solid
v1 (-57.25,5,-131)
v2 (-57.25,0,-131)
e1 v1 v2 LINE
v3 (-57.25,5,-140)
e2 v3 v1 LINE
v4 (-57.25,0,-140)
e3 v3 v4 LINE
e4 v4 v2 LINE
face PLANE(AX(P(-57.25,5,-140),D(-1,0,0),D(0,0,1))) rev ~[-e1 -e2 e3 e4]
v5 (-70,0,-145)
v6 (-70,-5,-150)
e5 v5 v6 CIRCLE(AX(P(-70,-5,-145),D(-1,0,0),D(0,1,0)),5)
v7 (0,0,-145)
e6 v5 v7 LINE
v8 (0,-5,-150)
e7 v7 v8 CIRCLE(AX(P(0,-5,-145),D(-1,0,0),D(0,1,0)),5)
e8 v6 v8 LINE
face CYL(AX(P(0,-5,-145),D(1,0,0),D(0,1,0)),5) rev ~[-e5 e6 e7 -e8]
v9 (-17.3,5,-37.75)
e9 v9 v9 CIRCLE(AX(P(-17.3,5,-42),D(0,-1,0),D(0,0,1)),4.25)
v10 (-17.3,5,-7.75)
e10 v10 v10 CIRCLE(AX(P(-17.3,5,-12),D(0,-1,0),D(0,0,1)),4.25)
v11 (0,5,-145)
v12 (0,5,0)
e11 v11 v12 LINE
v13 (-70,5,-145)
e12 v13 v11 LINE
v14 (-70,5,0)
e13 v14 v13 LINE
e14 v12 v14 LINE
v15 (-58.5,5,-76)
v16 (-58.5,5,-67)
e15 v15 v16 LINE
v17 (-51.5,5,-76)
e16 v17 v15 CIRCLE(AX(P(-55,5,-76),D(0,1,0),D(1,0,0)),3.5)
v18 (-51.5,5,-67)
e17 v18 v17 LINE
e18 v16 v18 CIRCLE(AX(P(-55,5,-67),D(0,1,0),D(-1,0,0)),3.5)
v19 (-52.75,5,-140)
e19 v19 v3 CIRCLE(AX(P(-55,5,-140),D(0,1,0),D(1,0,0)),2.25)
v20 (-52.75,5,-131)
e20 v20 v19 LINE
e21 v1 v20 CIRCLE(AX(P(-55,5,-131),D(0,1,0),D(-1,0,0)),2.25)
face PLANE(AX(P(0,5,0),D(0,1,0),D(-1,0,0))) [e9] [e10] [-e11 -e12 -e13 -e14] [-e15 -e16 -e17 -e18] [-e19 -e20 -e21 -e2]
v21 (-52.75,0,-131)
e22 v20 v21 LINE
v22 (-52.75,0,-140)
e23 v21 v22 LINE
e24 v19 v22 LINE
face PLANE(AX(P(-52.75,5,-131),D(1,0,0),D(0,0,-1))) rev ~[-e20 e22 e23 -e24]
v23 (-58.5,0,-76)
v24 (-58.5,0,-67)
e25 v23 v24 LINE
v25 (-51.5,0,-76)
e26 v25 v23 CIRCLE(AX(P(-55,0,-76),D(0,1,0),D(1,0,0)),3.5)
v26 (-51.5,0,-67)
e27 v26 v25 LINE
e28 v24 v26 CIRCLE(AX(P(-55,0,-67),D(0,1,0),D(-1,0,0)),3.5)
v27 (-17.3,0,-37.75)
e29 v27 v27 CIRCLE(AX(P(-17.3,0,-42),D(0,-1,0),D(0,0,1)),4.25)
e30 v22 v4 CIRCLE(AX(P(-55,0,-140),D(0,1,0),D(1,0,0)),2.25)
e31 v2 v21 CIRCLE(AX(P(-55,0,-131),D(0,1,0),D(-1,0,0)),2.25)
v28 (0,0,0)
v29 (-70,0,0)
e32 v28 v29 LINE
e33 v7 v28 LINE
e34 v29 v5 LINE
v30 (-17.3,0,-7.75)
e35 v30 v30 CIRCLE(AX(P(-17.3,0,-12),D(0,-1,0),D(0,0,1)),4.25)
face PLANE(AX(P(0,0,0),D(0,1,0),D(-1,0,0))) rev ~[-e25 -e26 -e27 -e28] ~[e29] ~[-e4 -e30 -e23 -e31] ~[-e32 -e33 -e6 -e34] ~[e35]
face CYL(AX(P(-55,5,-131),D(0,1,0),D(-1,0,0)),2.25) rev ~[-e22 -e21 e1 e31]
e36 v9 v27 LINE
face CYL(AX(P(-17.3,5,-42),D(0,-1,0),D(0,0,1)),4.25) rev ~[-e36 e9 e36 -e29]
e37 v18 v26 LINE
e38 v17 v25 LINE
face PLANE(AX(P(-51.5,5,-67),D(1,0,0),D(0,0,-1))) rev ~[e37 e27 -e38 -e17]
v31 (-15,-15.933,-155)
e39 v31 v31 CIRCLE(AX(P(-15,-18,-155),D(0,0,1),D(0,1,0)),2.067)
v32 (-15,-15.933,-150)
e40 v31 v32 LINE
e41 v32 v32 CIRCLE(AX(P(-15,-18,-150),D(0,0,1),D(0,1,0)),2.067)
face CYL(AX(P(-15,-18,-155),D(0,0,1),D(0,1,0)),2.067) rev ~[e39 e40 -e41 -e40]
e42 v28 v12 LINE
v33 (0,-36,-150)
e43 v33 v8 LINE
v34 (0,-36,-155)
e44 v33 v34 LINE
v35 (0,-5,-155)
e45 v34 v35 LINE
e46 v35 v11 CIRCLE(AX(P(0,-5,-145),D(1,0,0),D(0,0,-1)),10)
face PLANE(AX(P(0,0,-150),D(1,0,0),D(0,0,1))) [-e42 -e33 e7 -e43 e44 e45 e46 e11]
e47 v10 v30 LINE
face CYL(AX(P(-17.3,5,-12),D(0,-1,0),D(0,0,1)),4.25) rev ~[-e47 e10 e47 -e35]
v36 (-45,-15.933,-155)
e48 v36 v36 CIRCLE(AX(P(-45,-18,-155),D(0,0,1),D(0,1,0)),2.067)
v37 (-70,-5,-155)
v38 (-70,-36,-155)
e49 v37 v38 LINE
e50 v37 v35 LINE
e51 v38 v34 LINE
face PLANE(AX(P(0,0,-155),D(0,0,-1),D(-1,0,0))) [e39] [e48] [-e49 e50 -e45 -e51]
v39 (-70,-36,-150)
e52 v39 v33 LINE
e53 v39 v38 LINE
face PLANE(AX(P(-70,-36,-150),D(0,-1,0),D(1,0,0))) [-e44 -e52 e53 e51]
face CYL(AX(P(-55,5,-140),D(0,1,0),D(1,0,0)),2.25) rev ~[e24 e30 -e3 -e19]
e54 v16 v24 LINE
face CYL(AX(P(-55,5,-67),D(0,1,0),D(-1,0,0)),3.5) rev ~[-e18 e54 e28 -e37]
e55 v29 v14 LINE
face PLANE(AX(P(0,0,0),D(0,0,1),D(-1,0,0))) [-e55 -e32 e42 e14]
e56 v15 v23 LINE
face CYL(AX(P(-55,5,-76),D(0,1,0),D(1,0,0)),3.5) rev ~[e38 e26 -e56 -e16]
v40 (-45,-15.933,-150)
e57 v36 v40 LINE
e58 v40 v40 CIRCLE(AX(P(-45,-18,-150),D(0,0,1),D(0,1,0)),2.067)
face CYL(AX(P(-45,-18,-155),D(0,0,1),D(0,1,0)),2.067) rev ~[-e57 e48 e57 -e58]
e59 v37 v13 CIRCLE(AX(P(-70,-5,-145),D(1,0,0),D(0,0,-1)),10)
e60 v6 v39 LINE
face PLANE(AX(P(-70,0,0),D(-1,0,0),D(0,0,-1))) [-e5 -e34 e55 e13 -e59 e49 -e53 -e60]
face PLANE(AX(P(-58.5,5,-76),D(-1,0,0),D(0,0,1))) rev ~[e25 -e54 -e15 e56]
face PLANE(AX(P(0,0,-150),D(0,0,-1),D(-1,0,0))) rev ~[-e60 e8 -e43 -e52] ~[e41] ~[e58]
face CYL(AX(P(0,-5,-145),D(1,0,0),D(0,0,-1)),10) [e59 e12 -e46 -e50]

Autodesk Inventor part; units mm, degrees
ref_plane "YZ Plane" through (0, 0, 0) normal (1, 0, 0) x (0, 1, 0)
ref_plane "XZ Plane" through (0, 0, 0) normal (0, 1, 0) x (-1, 0, 0)
ref_plane "XY Plane" through (0, 0, 0) normal (0, 0, 1) x (1, 0, 0)
sketch "Sketch1" plane through (0, 0, 0) normal (0, 1, 0) x (-1, 0, 0)
  line L0 (0, 0) -> (70, 0)
  line L1 (70, 0) -> (70, -150)
  line L2 (70, -150) -> (0, -150)
  line L3 (0, -150) -> (0, 0)
  dimension "d0" = 70
  dimension "d1" = 150
extrude "Plate1" add sketch "Sketch1" along normal blind 5
sketch "Sketch2" plane through (0, 0, -150) normal (0, 0, -1) x (-1, 0, 0)
  line L0 (70, 5) -> (0, 5)
  line L1 (0, 5) -> (70, 5)
  line L2 (70, 5) -> (70, -36)
  line L3 (70, -36) -> (0, -36)
  line L4 (0, -36) -> (0, 5)
  point P0 (0, 0)
  dimension "d3" = 70
  dimension "d4" = 41
sheet face with bend "Face2" sketch "Sketch2" thickness 5 toward (0, 0, -1) bend radius 5
bend "Bend1"
sketch "Sketch3" plane through (0, 0, -155) normal (0, 0, -1) x (-1, 0, 0)
  line L0 (70, -36) -> (0, -36) projected
  line L1 (70, -5) -> (70, -36) projected
  point P0 (0, 0)
  point P1 (45, -18)
  point P2 (15, -18)
  dimension "d10" = 18
  dimension "d11" = 18
  dimension "d19" = 25
  dimension "d20" = 30
hole "Hole1" at (-45, -18, -155) at (-15, -18, -155) direction (0, 0, 1) diameter 4.134 depth 5 thread size "M5x0.8" class "6H" standard "ISO Metric profile"
sketch "Sketch4" plane through (0, 5, 0) normal (0, 1, 0) x (1, 0, 0)
  line L0 (-70, 145) -> (0, 145) projected
  line L1 (-55, 145) -> (-55, 0) construction
  line L2 (-70, 0) -> (0, 0) projected
  line L3 (-70, 0) -> (-70, 145) projected
  line L4 (-57.25, 131) -> (-52.75, 131)
  line L5 (-52.75, 131) -> (-52.75, 140)
  line L6 (-52.75, 140) -> (-57.25, 140)
  line L7 (-57.25, 140) -> (-57.25, 131)
  line L8 (-57.25, 131) -> (-52.75, 140) construction
  line L9 (-52.75, 131) -> (-57.25, 140) construction
  arc A0 (-52.75, 140) -> (-57.25, 140) centre (-55, 140) ccw
  arc A1 (-57.25, 131) -> (-52.75, 131) centre (-55, 131) ccw
  line L10 (-55, 140) -> (-51.5, 76.0958) construction
  line L11 (-55, 140) -> (9, 140) construction
  line L12 (-55, 131) -> (-51.5, 67.0958) construction
  line L13 (-55, 131) -> (9, 131) construction
  line L14 (-58.5, 67) -> (-51.5, 67)
  line L15 (-51.5, 67) -> (-51.5, 76)
  line L16 (-51.5, 76) -> (-58.5, 76)
  line L17 (-58.5, 76) -> (-58.5, 67)
  line L18 (-58.5, 67) -> (-51.5, 76) construction
  line L19 (-51.5, 67) -> (-58.5, 76) construction
  arc A2 (-51.5, 76) -> (-58.5, 76) centre (-55, 76) ccw
  arc A3 (-58.5, 67) -> (-51.5, 67) centre (-55, 67) ccw
  point P0 (-70, 72.5)
  point P1 (-55, 135.5)
  point P2 (-55, 71.5)
  dimension "d21" = 15
  dimension "d22" = 4.5
  dimension "d23" = 9
  dimension "d25" = 5
  dimension "d32" = 64
  dimension "d34" = 64
  dimension "d36" = 7
  dimension "d37" = 9
  dimension "d40" = 64
extrude "Extrusion1" cut sketch "Sketch4" against normal up to surface (5 mm away)
sketch "Sketch5" plane through (0, 5, 0) normal (0, 1, 0) x (1, 0, 0)
  line L0 (-70, 0) -> (-70, 145) projected
  line L1 (0, 0) -> (-70, 0) projected
  point P0 (-17.3, 42)
  point P1 (-17.3, 12)
  dimension "d41" = 52.7
  dimension "d42" = 52.7
  dimension "d50" = 30
  dimension "d51" = 12
hole "Hole2" at (-17.3, 5, -12) at (-17.3, 5, -42) direction (0, -1, 0) diameter 8.5 end through all
equation "\"d11\" = d10"
equation "\"d17\" = Thickness"
equation "\"d37\" = d23"
equation "\"d2\" = Thickness"
equation "\"d5\" = BendRadius"
equation "\"d6\" = BendReliefWidth"
equation "\"d8\" = MinimumRemnant"
equation "\"d7\" = BendReliefDepth"
equation "\"d9\" = TransitionRadius"
equation "\"d42\" = d41"
equation "\"BendRadius\" = Thickness"
equation "\"BendReliefWidth\" = Thickness"
equation "\"BendReliefDepth\" = 0.5 * Thickness"
equation "\"TransitionRadius\" = BendRadius"
equation "\"JacobiRadiusSize\" = BendRadius"
equation "\"GapSize\" = Thickness"
equation "\"Thickness\" = 5"
equation "\"MinimumRemnant\" = 10"
properties part number "ER_Halterung_Kantensensor"
